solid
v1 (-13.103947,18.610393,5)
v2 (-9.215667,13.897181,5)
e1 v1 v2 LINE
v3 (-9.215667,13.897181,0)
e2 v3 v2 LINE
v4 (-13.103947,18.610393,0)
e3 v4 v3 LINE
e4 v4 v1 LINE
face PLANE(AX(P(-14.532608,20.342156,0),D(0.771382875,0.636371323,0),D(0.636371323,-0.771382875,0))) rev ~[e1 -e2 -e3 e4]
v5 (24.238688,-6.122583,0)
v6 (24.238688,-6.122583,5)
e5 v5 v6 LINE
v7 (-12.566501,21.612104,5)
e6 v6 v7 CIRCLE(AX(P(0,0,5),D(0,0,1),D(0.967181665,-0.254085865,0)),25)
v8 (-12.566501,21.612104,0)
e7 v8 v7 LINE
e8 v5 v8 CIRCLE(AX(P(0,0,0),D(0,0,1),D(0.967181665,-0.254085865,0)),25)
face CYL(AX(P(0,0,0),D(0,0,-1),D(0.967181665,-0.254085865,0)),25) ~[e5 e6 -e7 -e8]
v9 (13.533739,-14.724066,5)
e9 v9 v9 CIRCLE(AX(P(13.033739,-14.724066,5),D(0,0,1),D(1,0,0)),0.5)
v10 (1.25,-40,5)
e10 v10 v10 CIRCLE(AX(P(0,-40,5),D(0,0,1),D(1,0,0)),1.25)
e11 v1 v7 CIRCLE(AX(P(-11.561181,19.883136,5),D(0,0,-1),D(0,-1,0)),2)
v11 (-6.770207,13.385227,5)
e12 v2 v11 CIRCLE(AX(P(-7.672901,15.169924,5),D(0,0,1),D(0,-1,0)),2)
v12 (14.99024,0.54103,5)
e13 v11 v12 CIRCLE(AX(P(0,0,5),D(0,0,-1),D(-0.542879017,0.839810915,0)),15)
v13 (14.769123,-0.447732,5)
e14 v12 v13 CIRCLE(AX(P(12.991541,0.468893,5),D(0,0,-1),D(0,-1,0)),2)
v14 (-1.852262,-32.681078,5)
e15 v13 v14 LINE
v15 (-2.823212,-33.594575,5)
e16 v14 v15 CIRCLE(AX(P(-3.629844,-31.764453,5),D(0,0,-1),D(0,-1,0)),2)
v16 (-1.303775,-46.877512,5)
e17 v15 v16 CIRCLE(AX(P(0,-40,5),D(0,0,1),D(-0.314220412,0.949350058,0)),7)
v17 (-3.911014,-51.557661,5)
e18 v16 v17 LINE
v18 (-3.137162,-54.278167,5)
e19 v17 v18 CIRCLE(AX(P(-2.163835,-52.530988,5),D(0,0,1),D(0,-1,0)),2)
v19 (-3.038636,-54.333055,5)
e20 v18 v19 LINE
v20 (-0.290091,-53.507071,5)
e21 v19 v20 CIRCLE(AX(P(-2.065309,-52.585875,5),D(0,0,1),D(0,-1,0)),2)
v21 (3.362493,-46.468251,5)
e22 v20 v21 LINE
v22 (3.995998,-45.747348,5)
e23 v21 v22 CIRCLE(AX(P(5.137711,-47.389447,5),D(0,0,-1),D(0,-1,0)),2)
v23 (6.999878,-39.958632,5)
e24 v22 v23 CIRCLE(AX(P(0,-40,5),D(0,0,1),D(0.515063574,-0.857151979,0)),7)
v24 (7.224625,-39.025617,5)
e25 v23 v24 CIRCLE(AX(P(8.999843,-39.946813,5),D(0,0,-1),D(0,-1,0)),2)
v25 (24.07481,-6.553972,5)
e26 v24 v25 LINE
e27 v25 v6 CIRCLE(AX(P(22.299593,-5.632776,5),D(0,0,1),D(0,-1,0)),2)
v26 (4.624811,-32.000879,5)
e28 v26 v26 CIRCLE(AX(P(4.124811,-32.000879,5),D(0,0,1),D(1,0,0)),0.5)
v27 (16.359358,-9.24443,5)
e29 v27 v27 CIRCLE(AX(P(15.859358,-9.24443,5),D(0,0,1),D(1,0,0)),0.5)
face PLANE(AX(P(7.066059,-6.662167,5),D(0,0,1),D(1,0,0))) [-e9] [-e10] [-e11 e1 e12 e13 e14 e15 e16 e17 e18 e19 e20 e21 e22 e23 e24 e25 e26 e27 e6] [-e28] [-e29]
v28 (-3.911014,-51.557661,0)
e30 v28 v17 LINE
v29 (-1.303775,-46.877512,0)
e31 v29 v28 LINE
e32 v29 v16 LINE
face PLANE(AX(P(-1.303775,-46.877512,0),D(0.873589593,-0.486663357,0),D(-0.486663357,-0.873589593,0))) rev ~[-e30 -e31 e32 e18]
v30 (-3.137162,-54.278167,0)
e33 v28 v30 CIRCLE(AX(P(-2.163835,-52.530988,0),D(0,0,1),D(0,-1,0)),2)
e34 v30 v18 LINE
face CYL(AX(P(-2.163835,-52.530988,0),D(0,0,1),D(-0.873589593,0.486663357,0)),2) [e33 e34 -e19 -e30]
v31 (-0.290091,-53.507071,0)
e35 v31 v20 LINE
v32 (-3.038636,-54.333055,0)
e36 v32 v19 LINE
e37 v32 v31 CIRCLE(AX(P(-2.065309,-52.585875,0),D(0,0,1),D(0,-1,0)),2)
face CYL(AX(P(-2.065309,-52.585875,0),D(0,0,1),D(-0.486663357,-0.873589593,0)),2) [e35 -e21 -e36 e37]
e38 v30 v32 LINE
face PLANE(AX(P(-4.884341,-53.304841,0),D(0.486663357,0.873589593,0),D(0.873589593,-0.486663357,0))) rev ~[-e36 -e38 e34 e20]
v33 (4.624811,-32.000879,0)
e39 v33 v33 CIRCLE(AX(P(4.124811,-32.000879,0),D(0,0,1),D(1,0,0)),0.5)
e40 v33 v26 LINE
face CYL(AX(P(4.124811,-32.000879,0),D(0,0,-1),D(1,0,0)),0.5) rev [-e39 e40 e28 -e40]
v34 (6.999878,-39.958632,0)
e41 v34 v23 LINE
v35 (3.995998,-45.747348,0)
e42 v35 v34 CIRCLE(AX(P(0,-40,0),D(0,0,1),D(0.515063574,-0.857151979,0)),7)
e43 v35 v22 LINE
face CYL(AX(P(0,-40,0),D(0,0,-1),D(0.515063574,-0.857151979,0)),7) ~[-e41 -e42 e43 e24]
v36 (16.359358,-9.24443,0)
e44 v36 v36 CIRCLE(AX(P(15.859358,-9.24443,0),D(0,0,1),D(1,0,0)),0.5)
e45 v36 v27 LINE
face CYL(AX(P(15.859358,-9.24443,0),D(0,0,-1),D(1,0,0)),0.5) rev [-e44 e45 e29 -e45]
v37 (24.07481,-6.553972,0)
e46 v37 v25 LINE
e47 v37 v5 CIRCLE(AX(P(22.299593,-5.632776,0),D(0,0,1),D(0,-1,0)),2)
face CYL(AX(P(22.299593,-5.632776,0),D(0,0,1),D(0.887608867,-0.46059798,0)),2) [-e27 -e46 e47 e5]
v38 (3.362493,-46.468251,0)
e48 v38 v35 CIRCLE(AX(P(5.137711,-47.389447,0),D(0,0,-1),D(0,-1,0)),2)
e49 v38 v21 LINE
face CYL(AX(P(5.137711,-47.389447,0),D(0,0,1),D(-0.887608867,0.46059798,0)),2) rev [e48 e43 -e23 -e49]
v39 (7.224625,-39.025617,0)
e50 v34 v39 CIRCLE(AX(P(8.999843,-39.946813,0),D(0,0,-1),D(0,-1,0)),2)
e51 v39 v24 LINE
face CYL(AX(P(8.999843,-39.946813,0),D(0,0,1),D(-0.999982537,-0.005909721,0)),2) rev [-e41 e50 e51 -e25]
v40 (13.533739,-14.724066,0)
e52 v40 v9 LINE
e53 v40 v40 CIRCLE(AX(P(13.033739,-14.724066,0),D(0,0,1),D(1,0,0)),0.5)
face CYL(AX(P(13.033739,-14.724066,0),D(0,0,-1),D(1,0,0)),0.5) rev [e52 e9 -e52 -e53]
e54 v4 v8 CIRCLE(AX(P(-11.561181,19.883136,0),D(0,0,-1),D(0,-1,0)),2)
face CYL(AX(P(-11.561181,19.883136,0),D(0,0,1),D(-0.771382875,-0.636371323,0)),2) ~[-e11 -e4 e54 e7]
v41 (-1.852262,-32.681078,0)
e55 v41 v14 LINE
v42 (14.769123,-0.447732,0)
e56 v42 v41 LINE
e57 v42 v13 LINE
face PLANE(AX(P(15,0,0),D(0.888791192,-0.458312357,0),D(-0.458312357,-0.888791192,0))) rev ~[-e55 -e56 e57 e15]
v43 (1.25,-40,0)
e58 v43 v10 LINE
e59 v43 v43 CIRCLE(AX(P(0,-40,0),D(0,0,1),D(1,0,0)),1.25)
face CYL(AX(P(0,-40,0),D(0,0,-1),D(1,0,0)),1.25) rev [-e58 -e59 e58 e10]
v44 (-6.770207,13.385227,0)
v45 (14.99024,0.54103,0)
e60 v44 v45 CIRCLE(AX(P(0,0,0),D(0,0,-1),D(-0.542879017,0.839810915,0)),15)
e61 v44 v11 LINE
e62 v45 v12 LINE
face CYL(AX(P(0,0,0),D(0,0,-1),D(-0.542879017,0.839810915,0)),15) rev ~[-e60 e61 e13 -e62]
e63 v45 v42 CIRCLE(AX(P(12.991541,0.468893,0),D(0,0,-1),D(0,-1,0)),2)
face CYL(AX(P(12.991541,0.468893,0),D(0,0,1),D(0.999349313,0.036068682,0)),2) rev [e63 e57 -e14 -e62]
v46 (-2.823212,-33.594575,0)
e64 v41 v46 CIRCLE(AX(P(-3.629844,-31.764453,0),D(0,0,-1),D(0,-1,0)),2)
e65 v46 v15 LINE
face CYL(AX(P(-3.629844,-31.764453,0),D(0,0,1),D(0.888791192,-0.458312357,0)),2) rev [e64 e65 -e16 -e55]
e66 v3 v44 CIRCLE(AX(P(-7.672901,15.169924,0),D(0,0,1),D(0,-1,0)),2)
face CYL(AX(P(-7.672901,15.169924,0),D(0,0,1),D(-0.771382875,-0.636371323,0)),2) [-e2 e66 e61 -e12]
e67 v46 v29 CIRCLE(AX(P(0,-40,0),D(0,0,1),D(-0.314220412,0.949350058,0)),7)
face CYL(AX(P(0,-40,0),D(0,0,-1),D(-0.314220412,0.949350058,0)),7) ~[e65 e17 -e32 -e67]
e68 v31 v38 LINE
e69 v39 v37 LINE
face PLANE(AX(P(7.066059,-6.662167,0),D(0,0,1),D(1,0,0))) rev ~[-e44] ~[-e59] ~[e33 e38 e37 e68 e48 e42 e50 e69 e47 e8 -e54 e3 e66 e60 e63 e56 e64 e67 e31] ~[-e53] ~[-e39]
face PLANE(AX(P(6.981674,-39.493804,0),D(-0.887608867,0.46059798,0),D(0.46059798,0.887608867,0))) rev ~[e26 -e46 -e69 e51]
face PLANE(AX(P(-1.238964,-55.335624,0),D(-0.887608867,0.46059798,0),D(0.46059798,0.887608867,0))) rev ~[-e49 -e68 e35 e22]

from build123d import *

# Parameters (mm, degrees)
F0_R     = 1.25
F0_R_2   = 0.5
F1_DEPTH = 5
F2_R     = 2


# Not quite as in the source:
# - two fillets or chamfers of one size are made in one step
# - a feature names something its author has since deleted; it is built from what else it names


with BuildPart() as f1:
    # F0 (on Top) → F1 (new body)
    with BuildSketch(Plane.XY):
        with BuildLine():
            Line((-14.5326076762, 20.3421560836), (-8.1431852604, 12.5971637211))
            ThreePointArc((-8.1431852604, 12.5971637211), (7.1712000772, 13.174744379), (15, 0))
            Line((15, 0), (-2.1995428838, -33.3545495937))
            ThreePointArc((-2.1995428838, -33.3545495937), (-6.9846930225, -40.4626698406), (-1.3037745428, -46.8775120459))
            ThreePointArc((-1.3037745428, -46.8775120459), (1.2316251761, -46.8907981704), (3.6054450158, -46.0000638528))
            Line((3.6054450158, -46.0000638528), (6.9816735201, -39.4938035379))
            Line((6.9816735201, -39.4938035379), (24.1795416276, -6.3521466198))
            ThreePointArc((24.1795416276, -6.3521466198), (14.1919795262, 20.5812467341), (-14.5326076762, 20.3421560836))
        make_face()
        with Locations((0, -40)):
            Circle(F0_R, mode=Mode.SUBTRACT)
        with Locations((4.1248112098, -32.0008792681)):
            Circle(F0_R_2, mode=Mode.SUBTRACT)
        with Locations((13.0337394799, -14.7240660517)):
            Circle(F0_R_2, mode=Mode.SUBTRACT)
        with Locations((15.8593580654, -9.2444300009)):
            Circle(F0_R_2, mode=Mode.SUBTRACT)
        with BuildLine():
            ThreePointArc((3.6054450158, -46.0000638528), (1.2316251761, -46.8907981704), (-1.3037745428, -46.8775120459))
            Line((-1.3037745428, -46.8775120459), (-4.8843406974, -53.3048406851))
            Line((-4.8843406974, -53.3048406851), (-1.2389638203, -55.3356242034))
            Line((-1.2389638203, -55.3356242034), (3.6054450158, -46.0000638528))
        make_face()
        with BuildLine():
            ThreePointArc((3.6054450158, -46.0000638528), (6.2132620695, -43.2241858593), (6.9816735201, -39.4938035379))
            Line((6.9816735201, -39.4938035379), (3.6054450158, -46.0000638528))
        make_face()
    extrude(amount=F1_DEPTH)

    # F2
    f2_edges = [f1.edges().sort_by_distance(p)[0] for p in [
        (6.981674, -39.493804, 2.5),
        (15, 0, 2.5),
        (-8.143185, 12.597164, 2.5),
        (-14.532608, 20.342156, 2.5),
        (24.179542, -6.352147, 2.5),
        (-2.199543, -33.35455, 2.5),
        (-4.884341, -53.304841, 2.5),
        (-1.238964, -55.335624, 2.5),
        (3.605445, -46.000064, 2.5),
    ]]
    fillet(f2_edges, radius=F2_R)


solid = f1.part
